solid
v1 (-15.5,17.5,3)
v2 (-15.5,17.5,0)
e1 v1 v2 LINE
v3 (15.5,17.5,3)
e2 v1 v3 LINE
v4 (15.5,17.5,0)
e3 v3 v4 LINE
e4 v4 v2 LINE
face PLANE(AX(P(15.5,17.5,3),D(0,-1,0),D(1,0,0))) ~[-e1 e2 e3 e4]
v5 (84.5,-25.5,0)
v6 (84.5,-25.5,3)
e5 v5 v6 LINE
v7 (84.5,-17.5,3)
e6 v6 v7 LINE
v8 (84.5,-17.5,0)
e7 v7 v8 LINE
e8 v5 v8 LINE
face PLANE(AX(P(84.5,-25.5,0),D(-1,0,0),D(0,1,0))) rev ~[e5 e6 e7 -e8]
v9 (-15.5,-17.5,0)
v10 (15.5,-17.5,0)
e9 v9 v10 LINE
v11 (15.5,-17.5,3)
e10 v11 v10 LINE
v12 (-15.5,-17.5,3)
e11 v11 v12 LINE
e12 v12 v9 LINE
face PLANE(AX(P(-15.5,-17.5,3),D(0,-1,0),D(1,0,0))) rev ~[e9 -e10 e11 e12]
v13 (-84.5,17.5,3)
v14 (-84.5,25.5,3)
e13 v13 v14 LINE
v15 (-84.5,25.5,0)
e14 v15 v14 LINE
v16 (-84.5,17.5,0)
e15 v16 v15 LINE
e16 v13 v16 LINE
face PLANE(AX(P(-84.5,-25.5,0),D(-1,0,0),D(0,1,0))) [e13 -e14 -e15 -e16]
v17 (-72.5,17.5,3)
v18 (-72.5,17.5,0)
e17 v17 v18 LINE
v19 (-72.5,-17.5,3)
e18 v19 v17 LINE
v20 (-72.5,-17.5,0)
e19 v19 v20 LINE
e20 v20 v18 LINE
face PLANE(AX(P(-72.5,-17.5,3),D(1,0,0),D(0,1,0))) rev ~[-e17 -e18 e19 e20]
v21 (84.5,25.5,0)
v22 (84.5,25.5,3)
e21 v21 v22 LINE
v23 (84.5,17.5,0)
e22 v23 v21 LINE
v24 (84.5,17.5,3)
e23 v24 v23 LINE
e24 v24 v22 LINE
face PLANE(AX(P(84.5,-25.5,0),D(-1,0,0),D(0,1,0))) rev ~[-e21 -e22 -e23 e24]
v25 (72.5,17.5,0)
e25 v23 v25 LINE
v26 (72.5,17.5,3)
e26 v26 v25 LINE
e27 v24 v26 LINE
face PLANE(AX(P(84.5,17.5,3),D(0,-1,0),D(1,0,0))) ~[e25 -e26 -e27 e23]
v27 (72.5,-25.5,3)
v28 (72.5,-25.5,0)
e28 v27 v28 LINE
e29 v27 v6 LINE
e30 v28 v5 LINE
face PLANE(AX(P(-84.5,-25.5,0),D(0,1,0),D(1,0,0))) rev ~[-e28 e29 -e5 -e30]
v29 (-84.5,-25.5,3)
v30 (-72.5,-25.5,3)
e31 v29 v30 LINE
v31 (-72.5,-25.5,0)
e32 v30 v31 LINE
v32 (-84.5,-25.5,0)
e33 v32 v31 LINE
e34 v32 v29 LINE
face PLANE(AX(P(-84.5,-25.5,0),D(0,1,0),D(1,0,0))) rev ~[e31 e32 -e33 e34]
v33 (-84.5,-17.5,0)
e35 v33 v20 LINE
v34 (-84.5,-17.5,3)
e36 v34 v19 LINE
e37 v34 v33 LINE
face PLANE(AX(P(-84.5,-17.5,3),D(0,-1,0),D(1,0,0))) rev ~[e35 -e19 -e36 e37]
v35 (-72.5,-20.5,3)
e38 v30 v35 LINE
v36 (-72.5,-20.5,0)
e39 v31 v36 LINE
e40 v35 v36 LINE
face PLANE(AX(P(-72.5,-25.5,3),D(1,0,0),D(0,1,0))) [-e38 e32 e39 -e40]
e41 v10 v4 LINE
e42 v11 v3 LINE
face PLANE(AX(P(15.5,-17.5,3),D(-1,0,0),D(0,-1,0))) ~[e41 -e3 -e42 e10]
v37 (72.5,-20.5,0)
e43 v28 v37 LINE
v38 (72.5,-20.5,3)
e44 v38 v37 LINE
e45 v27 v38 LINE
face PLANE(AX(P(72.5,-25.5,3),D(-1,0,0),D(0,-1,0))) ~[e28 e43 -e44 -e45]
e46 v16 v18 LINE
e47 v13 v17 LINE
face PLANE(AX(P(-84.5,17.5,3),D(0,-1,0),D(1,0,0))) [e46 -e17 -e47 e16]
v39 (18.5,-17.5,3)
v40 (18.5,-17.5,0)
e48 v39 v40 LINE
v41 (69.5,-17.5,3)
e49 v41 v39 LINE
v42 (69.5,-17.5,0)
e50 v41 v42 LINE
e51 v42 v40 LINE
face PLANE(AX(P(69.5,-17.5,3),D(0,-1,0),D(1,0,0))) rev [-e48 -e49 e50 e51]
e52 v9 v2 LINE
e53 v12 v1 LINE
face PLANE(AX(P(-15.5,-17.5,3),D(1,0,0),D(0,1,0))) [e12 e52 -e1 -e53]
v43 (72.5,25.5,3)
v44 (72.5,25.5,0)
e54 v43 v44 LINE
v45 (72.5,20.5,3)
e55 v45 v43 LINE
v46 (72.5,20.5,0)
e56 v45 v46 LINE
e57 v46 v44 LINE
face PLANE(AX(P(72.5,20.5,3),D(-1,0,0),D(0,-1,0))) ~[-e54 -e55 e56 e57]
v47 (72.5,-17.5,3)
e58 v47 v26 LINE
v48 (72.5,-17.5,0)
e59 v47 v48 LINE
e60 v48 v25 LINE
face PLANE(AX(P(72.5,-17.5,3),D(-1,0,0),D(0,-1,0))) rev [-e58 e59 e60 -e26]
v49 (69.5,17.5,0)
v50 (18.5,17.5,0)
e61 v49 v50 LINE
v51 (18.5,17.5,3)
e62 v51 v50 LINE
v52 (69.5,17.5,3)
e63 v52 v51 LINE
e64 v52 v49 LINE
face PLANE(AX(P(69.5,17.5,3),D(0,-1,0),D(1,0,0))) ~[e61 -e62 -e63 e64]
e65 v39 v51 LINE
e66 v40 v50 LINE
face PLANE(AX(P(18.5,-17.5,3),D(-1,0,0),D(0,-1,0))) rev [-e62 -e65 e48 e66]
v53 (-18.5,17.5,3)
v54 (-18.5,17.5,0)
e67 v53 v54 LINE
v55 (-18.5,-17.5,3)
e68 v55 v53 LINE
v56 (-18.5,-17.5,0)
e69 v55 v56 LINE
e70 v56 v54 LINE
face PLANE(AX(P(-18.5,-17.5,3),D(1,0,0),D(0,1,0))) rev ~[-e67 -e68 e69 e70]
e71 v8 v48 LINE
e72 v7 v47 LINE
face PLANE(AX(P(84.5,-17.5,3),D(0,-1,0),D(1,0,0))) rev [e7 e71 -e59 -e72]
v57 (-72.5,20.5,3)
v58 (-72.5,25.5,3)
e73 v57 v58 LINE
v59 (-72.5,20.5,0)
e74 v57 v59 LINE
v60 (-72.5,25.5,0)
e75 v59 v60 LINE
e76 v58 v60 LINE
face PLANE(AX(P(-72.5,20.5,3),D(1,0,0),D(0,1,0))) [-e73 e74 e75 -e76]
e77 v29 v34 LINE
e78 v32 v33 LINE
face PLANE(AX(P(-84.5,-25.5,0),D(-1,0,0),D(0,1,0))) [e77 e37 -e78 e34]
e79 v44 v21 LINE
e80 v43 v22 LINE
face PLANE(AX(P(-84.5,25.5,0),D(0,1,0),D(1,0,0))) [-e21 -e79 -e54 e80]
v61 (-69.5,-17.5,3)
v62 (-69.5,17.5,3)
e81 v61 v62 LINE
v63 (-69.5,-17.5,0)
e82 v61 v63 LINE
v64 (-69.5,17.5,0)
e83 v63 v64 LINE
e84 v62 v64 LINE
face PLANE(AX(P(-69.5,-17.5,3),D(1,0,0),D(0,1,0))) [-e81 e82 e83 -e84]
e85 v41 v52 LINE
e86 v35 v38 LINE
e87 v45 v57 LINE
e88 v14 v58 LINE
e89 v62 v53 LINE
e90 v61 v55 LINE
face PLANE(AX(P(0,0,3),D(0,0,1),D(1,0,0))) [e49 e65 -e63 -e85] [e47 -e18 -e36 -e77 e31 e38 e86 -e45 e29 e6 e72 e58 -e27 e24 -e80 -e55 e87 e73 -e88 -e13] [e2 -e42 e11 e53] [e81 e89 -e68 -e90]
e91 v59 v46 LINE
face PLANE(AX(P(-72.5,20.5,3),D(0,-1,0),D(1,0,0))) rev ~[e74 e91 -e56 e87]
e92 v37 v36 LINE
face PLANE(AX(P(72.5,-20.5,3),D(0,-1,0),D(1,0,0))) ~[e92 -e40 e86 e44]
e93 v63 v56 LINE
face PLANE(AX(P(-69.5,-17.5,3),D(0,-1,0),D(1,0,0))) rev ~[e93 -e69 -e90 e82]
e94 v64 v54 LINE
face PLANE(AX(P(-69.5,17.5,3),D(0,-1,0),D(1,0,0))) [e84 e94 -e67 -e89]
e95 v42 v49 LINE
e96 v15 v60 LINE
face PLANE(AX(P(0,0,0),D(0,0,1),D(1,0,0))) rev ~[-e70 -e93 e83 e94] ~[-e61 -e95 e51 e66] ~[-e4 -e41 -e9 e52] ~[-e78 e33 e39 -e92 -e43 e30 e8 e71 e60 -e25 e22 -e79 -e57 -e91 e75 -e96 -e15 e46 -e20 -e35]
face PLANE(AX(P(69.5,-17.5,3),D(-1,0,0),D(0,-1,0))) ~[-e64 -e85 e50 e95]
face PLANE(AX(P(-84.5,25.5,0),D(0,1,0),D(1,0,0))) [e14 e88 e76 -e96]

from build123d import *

# Parameters (mm, degrees)
F0_W     = 169
F0_H     = 51
F1_DEPTH = 3
F2_W     = 51
F2_H     = 35
F2_W_2   = 12
F2_W_3   = 72.5
F2_H_2   = 5
F2_W_4   = 15.5
F3_DEPTH = 3


# Not quite as in the source:
# - a pattern or mirror of a feature is missing from the dataset's text; its kind, count and spacing are read off the source's solid


with BuildPart() as f1:
    # F0 (on Top) → F1 (new body)
    with BuildSketch(Plane.XY):
        Rectangle(F0_W, F0_H)
    extrude(amount=F1_DEPTH)

    # F2 (on face) → F3 (cut, through all)
    with BuildSketch(Plane.XY.offset(3)):
        with Locations((-44, 0)):
            Rectangle(F2_W, F2_H)
        with Locations((-78.5, 0)):
            Rectangle(F2_W_2, F2_H)
        with Locations((-36.25, 23)):
            Rectangle(F2_W_3, F2_H_2)
        with Locations((-36.25, -23)):
            Rectangle(F2_W_3, F2_H_2)
        with Locations((-7.75, 0)):
            Rectangle(F2_W_4, F2_H)
    f3 = extrude(amount=-F3_DEPTH, mode=Mode.SUBTRACT)

    # F3_copies: F3 across plane
    add(f3.mirror(Plane(origin=(0, 0, 0), x_dir=(0, 0, 1), z_dir=(1, 0, 0))), mode=Mode.SUBTRACT)


solid = f1.part
